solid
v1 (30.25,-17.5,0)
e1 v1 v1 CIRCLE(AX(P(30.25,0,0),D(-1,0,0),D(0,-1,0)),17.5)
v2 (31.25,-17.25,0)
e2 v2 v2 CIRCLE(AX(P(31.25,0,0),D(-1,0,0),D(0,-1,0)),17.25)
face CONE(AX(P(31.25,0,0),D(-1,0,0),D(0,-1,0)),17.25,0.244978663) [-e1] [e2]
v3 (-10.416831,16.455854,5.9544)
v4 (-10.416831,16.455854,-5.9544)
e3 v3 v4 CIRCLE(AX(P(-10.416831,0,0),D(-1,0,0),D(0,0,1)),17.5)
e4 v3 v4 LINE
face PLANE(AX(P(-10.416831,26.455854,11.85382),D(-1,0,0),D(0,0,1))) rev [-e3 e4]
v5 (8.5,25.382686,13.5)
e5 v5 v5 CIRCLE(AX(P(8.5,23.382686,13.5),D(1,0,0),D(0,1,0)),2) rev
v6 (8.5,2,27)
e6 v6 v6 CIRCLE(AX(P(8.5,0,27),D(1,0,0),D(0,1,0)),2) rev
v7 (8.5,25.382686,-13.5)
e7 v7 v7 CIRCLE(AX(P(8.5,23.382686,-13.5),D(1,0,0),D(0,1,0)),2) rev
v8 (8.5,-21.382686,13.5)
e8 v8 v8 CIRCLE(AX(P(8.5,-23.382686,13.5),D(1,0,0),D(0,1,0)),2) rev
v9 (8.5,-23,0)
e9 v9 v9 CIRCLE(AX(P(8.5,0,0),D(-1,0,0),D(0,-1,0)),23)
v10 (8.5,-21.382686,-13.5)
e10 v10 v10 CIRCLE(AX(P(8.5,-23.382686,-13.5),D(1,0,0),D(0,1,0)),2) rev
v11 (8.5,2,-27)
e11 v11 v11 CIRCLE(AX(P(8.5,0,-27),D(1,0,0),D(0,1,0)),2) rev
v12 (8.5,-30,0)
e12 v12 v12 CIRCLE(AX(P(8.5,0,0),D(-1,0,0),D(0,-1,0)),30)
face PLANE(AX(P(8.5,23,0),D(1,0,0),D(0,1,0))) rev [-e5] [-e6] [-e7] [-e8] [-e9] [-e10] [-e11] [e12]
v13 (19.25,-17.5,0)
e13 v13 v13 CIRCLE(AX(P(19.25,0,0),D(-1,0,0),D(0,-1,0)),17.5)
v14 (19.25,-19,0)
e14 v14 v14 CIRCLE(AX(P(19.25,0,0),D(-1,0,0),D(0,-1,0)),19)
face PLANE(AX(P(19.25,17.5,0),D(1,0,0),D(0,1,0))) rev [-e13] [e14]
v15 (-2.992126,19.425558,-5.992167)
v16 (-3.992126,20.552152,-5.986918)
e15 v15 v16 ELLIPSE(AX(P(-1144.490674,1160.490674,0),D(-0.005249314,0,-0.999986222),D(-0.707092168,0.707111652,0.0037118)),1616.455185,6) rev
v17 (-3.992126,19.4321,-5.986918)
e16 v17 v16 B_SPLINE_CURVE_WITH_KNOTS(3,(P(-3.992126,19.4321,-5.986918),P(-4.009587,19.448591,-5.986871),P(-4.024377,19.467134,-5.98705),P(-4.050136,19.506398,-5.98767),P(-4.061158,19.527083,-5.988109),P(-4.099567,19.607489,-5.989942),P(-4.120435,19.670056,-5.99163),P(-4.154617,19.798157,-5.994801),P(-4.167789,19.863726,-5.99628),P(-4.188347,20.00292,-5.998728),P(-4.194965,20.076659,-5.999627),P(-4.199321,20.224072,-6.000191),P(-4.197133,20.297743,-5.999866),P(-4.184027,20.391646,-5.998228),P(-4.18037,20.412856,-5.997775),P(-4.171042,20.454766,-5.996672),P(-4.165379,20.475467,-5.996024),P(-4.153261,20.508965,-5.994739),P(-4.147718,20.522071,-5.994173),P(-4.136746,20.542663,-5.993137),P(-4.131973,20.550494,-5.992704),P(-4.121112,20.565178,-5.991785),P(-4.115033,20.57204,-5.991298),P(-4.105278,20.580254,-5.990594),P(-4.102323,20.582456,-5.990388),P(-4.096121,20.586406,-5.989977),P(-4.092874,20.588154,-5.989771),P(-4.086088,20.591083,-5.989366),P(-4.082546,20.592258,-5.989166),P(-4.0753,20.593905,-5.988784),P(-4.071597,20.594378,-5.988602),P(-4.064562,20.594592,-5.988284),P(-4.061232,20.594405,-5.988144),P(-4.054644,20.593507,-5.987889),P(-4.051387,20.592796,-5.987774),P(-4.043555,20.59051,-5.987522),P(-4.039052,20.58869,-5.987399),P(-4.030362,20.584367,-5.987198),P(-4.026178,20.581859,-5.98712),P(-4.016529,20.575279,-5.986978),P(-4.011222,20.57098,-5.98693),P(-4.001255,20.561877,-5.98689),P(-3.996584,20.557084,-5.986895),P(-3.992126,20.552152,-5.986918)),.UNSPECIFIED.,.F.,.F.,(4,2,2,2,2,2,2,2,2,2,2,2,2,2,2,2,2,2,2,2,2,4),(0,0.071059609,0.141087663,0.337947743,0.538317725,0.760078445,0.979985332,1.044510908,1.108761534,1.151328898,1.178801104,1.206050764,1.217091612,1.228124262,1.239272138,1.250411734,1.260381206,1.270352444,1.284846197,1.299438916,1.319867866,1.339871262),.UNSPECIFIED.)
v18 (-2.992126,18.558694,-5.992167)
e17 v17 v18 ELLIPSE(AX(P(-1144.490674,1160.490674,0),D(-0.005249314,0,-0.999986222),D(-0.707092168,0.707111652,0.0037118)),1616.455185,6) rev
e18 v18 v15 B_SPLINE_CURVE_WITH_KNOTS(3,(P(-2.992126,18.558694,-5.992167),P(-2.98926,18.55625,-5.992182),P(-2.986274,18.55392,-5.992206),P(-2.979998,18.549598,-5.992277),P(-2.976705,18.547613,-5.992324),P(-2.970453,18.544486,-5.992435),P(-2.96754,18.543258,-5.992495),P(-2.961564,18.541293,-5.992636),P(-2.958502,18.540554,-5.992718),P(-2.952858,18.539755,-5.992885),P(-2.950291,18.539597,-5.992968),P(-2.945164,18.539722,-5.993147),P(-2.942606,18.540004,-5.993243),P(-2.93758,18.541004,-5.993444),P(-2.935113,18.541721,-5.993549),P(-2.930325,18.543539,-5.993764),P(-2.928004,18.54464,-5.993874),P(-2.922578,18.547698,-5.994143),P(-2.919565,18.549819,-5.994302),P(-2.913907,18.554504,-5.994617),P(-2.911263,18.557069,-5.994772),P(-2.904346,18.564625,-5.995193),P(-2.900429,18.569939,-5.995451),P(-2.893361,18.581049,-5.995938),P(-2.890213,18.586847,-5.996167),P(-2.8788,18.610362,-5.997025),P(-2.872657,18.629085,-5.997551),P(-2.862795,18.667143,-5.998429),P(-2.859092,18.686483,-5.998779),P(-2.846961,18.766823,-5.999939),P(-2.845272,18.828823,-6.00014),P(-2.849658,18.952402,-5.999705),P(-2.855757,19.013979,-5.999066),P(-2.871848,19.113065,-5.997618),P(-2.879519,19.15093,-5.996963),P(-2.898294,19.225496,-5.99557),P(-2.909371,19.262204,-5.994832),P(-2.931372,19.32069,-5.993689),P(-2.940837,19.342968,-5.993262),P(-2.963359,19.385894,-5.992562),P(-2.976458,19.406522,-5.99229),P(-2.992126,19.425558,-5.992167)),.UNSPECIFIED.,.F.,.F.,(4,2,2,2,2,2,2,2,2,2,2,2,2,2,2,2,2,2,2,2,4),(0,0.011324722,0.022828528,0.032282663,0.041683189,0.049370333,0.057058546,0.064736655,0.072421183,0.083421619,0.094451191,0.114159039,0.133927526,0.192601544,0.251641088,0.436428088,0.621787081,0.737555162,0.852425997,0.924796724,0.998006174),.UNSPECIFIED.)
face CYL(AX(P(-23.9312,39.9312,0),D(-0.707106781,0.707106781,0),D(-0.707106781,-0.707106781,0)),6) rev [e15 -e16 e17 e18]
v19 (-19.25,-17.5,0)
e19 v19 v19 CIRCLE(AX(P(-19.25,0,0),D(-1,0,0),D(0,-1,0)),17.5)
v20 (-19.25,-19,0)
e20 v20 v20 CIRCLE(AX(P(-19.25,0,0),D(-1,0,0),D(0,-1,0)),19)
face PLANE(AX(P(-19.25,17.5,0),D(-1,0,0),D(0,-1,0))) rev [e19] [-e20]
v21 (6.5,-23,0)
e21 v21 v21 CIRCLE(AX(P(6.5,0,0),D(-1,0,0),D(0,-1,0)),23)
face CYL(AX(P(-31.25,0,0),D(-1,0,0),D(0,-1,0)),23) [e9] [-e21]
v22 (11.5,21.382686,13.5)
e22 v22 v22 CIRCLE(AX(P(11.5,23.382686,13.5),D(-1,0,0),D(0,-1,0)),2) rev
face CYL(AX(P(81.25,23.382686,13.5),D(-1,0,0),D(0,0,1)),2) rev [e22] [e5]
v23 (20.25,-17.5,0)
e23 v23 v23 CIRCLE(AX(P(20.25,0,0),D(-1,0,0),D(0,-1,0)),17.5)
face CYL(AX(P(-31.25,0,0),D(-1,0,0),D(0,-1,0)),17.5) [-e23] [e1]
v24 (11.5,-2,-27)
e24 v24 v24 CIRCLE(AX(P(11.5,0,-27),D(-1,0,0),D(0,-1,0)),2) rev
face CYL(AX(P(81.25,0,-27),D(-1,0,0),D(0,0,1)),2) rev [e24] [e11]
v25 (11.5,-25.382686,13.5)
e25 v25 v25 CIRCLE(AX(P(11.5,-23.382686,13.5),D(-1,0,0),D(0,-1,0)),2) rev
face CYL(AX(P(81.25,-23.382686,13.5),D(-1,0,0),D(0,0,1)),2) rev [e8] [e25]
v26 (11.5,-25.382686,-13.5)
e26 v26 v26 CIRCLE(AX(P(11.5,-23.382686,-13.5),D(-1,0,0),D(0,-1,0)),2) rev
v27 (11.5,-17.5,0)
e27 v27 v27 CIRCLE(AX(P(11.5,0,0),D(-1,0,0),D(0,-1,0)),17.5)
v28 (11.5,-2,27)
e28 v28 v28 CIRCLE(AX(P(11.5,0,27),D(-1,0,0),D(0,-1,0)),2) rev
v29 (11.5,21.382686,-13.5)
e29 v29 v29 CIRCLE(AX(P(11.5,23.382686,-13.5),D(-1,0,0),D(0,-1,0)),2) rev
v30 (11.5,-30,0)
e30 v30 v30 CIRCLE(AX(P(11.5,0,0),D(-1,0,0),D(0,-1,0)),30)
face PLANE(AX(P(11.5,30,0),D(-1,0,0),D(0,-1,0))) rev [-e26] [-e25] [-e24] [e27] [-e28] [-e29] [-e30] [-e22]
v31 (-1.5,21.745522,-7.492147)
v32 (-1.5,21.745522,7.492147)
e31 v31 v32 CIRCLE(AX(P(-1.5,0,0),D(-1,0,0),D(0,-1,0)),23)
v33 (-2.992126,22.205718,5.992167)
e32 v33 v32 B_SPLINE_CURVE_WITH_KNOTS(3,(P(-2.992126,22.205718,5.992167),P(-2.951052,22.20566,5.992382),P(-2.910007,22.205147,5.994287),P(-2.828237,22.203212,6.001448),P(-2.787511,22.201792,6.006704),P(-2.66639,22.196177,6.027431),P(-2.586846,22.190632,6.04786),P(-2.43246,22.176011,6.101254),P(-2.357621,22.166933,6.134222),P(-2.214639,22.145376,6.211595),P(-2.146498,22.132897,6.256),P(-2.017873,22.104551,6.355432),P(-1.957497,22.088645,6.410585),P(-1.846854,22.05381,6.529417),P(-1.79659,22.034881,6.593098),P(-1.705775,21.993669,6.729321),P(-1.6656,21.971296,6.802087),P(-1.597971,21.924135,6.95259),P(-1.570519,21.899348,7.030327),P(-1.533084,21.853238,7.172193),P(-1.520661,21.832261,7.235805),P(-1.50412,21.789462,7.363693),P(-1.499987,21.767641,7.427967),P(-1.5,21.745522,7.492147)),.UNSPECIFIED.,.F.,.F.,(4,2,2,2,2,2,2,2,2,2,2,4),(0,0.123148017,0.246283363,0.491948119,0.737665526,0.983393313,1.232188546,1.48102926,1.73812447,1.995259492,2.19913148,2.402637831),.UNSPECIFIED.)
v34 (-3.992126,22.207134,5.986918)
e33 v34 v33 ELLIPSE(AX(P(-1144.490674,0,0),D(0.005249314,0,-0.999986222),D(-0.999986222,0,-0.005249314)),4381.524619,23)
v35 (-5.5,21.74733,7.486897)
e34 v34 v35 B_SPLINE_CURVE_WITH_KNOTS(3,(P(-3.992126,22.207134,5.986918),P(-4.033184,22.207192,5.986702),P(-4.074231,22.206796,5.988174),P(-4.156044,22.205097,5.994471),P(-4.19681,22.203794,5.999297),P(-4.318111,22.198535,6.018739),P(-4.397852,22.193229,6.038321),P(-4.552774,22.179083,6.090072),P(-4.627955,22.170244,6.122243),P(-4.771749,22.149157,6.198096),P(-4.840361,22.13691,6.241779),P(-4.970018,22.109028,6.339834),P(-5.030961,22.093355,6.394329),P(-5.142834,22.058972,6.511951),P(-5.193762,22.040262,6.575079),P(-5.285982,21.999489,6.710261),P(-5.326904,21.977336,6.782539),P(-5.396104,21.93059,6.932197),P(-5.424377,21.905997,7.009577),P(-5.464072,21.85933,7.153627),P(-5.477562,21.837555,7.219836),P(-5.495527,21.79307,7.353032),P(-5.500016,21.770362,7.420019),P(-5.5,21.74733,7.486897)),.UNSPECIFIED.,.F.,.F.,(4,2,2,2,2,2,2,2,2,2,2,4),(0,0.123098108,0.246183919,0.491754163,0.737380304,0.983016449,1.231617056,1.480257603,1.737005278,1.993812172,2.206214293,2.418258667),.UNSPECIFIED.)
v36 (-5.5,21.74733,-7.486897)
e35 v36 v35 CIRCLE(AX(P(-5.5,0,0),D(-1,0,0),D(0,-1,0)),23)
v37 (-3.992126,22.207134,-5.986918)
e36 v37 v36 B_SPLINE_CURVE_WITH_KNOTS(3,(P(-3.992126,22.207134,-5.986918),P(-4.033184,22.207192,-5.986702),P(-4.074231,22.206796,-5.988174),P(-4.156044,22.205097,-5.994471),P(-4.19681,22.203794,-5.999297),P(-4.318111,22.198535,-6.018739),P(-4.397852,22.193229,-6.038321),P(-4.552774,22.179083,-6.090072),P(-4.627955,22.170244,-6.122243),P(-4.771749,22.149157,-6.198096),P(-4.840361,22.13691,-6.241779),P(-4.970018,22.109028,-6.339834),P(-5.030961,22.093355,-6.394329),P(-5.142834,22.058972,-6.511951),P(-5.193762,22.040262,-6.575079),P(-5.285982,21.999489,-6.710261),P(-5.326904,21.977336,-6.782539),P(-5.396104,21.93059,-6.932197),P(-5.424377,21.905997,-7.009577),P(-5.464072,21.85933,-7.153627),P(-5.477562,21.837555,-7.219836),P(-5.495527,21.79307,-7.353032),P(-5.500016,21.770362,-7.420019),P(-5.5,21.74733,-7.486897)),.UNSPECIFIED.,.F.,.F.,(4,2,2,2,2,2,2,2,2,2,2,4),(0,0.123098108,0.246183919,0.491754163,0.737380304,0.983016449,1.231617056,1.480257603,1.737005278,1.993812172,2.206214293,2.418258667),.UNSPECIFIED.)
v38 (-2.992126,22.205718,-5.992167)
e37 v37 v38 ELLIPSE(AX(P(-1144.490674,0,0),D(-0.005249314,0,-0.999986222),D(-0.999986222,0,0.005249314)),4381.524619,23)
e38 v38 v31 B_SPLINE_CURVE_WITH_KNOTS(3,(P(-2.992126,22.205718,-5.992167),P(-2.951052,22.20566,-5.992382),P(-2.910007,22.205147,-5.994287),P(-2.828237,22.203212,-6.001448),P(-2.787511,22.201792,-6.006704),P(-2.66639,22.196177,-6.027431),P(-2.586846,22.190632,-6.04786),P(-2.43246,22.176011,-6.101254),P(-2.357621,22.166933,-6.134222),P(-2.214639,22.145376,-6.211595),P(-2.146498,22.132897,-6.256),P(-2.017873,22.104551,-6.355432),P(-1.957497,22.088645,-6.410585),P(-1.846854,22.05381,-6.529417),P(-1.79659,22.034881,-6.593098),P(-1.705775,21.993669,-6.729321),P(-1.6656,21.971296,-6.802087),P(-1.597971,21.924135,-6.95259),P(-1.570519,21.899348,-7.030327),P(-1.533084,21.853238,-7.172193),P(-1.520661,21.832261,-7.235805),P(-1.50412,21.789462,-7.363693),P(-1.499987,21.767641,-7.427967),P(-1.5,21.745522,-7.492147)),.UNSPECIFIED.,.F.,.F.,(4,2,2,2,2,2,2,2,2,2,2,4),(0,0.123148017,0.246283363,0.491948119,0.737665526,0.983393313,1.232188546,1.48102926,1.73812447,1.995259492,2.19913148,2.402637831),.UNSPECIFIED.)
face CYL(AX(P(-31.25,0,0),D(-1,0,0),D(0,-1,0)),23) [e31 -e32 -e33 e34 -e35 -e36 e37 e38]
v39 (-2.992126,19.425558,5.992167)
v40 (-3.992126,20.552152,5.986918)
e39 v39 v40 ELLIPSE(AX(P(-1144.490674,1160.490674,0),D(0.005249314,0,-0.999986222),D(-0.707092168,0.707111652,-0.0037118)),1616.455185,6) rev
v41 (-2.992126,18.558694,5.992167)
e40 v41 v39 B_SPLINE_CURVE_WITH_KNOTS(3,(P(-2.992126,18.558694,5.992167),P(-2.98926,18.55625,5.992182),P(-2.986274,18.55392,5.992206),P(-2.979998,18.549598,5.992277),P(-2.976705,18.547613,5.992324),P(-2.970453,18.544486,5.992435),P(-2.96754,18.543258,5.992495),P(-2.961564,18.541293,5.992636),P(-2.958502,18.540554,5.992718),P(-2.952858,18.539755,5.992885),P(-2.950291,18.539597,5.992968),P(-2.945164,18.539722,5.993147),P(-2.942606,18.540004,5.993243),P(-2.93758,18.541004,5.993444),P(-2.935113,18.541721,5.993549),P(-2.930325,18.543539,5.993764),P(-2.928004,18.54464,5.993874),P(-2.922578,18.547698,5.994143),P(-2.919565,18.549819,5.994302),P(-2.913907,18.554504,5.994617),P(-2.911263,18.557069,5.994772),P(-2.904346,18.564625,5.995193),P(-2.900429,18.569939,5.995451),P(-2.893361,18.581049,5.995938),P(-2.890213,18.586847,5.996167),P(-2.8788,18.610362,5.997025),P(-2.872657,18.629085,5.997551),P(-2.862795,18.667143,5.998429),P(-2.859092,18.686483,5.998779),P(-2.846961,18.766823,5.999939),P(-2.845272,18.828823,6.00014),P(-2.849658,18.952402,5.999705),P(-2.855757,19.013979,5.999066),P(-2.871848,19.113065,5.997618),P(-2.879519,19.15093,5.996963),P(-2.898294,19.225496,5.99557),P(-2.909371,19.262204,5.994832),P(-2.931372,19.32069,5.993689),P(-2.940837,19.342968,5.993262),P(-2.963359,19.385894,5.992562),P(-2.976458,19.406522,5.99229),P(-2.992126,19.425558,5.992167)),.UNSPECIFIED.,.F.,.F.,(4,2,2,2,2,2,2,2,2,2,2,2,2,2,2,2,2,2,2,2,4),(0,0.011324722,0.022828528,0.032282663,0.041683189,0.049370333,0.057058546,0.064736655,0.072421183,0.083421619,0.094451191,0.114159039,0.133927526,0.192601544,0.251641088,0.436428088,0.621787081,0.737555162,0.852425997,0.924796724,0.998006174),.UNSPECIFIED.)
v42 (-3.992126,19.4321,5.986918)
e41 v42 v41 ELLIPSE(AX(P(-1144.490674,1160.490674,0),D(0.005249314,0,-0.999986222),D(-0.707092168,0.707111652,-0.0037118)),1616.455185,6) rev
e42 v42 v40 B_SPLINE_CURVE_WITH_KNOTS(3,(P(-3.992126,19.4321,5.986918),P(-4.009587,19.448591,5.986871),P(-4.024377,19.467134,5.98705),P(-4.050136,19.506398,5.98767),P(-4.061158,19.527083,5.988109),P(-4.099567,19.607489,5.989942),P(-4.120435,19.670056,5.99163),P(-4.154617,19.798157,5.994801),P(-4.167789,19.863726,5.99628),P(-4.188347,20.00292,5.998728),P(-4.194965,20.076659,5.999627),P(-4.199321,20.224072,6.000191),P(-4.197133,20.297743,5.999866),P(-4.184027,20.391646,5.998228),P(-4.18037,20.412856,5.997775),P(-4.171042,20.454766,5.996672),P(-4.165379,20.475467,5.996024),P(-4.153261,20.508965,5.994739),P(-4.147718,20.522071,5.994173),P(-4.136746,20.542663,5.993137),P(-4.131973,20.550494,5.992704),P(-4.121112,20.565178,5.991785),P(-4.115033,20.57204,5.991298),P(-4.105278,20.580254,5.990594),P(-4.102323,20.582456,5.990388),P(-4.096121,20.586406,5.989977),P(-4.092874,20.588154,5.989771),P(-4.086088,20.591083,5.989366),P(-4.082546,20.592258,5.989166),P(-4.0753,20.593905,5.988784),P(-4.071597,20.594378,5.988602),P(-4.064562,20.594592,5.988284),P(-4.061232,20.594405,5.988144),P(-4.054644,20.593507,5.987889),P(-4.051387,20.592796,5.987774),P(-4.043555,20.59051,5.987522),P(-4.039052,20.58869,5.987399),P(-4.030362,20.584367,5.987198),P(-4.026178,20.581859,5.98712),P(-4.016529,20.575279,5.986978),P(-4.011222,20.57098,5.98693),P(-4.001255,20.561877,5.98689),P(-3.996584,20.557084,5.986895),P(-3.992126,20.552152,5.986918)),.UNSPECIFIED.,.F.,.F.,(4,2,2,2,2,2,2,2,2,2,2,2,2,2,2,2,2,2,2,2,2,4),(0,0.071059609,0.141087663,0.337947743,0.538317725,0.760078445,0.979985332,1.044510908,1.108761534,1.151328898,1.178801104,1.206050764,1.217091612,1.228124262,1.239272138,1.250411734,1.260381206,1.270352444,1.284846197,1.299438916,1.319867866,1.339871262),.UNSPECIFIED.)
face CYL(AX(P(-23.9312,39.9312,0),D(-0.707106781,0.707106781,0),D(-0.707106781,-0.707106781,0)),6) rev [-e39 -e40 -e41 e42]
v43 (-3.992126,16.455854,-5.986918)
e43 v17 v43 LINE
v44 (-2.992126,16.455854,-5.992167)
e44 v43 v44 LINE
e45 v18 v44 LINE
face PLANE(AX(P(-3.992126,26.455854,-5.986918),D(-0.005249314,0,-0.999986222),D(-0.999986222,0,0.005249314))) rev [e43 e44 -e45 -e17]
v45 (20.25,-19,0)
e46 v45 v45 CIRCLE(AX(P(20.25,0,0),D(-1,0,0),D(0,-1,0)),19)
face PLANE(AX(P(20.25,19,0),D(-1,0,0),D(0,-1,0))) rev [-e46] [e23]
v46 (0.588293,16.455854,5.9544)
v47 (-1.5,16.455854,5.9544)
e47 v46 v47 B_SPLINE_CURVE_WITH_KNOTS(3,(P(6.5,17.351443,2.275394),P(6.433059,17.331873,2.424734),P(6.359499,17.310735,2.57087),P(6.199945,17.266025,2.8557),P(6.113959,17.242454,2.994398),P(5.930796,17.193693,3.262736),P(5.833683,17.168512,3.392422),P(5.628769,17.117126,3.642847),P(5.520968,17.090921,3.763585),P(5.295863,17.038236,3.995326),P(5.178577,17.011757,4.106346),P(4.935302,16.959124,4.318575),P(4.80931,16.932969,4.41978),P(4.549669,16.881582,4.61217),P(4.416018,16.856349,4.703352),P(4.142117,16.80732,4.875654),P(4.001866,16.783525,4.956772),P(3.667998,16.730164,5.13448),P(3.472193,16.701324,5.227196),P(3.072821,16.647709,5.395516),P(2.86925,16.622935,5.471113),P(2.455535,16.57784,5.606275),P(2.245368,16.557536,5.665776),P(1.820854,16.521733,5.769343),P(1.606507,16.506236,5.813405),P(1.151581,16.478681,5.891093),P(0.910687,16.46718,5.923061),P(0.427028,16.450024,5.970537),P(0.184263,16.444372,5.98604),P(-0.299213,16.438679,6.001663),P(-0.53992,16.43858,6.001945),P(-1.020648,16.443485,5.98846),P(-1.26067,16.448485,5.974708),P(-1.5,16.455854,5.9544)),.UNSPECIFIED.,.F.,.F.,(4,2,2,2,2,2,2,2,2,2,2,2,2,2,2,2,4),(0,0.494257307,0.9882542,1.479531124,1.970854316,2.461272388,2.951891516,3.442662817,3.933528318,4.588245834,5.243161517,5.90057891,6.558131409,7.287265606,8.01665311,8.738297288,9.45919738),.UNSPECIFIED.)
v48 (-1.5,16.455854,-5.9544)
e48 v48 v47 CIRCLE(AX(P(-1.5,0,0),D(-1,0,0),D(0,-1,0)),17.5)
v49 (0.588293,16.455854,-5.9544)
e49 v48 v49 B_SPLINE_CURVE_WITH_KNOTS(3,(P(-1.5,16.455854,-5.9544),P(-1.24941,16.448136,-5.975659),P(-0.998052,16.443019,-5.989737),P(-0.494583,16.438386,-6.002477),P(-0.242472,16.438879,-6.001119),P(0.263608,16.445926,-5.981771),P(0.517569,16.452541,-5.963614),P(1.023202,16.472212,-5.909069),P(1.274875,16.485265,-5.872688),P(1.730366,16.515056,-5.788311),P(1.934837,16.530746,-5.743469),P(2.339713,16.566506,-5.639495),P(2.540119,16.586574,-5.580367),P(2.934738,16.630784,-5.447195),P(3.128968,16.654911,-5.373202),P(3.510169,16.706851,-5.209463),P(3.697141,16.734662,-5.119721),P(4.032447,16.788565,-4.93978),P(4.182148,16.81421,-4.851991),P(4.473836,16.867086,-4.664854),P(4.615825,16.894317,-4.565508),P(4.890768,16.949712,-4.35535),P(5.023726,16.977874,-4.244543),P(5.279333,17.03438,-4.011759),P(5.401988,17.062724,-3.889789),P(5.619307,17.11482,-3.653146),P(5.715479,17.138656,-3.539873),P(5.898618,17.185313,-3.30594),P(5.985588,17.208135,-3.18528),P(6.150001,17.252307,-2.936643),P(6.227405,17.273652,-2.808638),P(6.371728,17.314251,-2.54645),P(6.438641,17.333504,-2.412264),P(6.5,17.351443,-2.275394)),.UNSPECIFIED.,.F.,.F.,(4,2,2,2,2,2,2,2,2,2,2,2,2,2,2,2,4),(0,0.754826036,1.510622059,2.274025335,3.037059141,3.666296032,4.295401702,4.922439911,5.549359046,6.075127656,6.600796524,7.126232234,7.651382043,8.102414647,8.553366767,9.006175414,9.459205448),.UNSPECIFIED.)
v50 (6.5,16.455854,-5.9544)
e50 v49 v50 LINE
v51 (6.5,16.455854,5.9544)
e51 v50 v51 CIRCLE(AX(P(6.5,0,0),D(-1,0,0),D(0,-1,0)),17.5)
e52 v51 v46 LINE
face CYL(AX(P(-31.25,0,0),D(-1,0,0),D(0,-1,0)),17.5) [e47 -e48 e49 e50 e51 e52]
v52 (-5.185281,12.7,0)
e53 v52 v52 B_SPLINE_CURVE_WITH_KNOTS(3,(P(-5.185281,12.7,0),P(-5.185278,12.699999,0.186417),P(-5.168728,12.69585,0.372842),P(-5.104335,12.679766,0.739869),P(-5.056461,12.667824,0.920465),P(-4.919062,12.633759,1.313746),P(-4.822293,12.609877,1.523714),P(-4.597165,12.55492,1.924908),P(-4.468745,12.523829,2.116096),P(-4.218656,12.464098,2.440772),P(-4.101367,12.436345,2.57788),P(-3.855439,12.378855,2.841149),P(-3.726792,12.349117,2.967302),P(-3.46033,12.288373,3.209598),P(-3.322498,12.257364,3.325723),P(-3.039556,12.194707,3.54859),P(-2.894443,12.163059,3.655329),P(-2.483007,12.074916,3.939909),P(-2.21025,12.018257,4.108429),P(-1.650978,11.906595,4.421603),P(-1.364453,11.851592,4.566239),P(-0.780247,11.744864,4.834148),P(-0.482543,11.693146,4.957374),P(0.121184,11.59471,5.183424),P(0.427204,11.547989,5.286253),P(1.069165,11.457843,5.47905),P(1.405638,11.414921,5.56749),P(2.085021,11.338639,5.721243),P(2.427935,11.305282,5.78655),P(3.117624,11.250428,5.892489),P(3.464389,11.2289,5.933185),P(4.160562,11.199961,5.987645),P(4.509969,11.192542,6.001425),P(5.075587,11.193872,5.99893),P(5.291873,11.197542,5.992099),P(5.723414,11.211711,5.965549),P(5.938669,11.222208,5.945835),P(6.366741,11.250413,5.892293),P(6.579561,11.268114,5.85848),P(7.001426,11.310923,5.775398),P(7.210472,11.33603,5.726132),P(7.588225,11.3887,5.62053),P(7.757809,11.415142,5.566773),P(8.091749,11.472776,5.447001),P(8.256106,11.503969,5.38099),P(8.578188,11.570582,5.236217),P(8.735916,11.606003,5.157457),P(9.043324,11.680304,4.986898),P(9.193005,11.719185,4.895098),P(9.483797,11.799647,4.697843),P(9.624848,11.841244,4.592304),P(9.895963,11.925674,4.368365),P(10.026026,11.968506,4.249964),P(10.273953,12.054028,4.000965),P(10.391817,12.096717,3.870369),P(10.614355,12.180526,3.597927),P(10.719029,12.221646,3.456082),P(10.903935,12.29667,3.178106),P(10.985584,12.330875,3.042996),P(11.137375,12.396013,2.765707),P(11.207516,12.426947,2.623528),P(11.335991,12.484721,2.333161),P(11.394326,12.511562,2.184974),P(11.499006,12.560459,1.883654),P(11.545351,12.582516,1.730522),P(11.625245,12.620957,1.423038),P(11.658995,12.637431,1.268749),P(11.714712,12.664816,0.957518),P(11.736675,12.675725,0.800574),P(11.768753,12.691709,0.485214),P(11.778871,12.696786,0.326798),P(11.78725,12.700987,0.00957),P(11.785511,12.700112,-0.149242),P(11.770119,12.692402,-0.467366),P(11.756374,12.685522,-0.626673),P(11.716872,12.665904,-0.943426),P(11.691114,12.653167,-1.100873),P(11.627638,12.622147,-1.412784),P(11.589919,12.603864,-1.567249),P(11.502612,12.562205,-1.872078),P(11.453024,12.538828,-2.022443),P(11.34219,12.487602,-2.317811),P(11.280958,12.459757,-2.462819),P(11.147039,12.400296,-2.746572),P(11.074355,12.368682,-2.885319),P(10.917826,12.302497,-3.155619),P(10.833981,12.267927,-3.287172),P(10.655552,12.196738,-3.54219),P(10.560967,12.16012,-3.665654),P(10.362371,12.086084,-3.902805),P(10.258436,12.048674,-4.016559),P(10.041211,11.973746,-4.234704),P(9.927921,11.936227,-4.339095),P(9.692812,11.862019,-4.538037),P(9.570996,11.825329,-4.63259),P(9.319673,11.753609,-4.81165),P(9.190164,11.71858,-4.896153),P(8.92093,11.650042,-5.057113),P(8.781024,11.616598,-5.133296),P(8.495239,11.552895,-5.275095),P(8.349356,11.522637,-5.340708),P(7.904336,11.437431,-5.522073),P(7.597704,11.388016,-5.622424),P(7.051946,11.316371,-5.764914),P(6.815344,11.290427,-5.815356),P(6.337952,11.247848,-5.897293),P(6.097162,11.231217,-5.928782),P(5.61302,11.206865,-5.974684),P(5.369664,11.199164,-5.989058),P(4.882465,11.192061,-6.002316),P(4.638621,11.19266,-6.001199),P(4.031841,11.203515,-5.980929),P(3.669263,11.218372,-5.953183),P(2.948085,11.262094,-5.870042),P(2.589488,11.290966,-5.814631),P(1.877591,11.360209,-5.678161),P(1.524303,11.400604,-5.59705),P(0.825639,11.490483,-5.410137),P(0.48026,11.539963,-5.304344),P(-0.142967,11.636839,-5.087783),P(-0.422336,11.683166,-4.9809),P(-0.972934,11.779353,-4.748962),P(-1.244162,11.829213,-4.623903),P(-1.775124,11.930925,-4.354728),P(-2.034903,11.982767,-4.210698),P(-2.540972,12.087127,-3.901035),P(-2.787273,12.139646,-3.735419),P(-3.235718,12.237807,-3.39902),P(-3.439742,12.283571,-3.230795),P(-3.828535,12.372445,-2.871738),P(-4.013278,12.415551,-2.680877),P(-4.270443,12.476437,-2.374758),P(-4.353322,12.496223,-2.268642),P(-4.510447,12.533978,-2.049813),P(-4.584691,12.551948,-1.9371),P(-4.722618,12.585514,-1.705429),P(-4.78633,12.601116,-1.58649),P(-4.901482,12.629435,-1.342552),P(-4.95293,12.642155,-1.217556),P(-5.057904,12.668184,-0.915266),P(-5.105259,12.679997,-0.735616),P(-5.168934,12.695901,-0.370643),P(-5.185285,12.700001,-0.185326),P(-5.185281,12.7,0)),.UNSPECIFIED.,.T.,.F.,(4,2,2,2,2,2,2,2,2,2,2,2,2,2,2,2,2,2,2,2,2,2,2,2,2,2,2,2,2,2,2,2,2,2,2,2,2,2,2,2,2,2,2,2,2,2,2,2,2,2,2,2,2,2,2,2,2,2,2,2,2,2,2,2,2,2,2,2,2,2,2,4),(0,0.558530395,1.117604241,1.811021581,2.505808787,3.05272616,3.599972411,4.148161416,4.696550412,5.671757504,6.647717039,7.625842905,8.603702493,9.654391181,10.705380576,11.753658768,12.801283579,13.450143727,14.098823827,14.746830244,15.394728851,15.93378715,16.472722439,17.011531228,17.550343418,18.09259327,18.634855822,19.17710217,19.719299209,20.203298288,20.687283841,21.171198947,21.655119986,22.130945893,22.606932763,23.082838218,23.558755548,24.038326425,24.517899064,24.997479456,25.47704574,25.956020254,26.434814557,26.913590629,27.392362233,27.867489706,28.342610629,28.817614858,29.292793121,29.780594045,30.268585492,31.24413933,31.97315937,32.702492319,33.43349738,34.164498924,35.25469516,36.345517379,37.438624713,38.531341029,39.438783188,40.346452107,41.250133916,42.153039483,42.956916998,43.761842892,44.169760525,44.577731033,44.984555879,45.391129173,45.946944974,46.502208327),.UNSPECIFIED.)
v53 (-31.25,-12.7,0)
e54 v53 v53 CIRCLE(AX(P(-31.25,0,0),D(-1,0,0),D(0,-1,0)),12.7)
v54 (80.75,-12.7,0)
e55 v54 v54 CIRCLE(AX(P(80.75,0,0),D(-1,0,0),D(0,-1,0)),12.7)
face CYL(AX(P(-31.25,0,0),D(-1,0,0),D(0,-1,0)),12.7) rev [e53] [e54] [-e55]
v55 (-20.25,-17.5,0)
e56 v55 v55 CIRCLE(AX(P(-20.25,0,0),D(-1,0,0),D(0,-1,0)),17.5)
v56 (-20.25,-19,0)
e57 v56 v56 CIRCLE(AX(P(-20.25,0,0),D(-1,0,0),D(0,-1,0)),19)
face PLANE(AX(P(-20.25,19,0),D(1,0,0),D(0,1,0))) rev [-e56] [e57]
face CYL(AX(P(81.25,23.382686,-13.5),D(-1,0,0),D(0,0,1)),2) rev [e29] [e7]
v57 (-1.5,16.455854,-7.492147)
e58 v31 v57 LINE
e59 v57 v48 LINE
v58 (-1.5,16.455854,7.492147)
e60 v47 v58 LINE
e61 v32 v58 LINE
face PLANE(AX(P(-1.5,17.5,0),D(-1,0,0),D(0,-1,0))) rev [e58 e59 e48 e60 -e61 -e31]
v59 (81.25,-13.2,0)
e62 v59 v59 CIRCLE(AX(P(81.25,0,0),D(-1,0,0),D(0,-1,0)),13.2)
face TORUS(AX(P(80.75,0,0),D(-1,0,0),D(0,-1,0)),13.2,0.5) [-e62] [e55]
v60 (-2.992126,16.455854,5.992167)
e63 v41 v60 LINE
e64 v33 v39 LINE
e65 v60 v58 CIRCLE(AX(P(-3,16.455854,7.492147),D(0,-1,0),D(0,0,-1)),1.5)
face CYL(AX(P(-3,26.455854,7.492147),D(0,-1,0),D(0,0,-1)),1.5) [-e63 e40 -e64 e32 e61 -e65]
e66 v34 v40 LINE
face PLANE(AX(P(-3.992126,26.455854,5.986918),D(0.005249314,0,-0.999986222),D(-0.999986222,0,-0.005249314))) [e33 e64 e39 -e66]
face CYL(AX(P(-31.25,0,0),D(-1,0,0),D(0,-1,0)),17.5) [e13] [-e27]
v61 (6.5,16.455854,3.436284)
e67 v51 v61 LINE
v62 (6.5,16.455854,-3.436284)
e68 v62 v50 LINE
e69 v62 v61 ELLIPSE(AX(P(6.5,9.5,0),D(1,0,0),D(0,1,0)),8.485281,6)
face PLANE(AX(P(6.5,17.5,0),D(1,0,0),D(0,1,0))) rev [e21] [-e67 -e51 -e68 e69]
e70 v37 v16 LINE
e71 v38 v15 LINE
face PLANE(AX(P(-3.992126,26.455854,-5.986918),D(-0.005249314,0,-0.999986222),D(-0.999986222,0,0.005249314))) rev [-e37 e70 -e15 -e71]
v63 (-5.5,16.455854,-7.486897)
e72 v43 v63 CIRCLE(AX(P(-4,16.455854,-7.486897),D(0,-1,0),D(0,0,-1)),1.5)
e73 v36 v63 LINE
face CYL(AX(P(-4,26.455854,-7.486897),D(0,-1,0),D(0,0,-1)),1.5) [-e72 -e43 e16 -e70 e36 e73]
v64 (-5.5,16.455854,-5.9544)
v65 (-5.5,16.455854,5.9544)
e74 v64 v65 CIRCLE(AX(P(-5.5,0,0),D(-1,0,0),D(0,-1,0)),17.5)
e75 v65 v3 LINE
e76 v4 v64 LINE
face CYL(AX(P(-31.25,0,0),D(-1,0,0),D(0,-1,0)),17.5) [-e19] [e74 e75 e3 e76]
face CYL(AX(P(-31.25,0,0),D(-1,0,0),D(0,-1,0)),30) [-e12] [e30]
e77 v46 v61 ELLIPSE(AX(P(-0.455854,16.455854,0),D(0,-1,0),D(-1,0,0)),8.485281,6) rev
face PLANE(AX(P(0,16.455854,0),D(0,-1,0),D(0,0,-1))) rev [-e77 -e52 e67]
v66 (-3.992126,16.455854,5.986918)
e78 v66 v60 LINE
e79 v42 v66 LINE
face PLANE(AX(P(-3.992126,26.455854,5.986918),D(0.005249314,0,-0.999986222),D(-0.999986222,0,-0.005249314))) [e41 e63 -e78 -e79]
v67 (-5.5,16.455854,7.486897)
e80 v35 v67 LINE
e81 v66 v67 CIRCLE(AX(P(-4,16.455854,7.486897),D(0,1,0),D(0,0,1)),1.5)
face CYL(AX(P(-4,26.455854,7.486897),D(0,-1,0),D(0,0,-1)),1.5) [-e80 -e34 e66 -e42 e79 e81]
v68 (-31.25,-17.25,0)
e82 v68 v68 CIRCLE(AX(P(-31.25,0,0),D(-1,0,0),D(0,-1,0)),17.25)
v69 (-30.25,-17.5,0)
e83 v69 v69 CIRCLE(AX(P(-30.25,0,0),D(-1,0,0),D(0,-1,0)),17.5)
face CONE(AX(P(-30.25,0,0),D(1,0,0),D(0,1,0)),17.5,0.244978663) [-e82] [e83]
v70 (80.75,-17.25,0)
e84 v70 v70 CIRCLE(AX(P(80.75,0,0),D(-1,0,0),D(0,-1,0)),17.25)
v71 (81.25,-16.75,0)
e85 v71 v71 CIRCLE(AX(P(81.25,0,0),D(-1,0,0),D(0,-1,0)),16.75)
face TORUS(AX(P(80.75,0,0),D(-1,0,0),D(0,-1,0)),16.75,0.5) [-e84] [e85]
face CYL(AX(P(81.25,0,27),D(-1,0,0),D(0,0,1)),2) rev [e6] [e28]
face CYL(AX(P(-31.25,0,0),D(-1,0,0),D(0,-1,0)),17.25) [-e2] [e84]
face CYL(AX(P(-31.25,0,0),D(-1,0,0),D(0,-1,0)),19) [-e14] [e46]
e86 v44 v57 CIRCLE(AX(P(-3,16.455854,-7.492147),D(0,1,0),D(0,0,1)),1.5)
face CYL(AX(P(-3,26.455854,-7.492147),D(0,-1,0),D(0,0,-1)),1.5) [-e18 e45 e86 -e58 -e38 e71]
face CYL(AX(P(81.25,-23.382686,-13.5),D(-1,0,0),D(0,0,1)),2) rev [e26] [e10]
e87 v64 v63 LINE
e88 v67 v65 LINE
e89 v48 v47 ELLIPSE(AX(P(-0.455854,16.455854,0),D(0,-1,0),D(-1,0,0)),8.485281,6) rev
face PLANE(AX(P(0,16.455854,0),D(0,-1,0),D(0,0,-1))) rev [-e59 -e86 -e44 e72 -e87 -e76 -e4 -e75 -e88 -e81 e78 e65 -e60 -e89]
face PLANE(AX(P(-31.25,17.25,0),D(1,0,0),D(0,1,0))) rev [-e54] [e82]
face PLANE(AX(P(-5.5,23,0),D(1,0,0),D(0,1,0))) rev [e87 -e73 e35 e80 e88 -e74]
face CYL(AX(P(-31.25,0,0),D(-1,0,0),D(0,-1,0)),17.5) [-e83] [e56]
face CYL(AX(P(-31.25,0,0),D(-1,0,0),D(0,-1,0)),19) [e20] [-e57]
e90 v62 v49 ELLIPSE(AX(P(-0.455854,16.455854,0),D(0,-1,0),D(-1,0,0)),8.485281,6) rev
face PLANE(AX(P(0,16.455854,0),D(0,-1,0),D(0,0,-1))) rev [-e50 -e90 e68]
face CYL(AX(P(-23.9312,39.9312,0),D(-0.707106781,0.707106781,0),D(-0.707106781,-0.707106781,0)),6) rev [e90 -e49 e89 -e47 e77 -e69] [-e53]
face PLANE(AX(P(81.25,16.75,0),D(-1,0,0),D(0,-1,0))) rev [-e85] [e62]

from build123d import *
from build123d.topology import SkipClean

# Parameters (mm, degrees)
SKETCH2_R          = 2
CUT_EXTRUDE1_DEPTH = 92.660037639
CUT_EXTRUDE2_DEPTH = 6.025391911


# Read off the part's stored shape, not the designer's step: Cut-Extrude2
with BuildPart() as part:
    # Sketch1 → Revolve1 (revolve)
    with BuildSketch(Plane.XY, mode=Mode.PRIVATE) as revolve1_sk:
        with BuildLine():
            Line((-1.5, 17.5), (6.5, 17.5))
            Line((6.5, 17.5), (6.5, 23))
            Line((6.5, 23), (8.5, 23))
            Line((8.5, 23), (8.5, 30))
            Line((8.5, 30), (11.5, 30))
            Line((11.5, 30), (11.5, 17.5))
            Line((11.5, 17.5), (19.25, 17.5))
            Line((19.25, 17.5), (19.25, 19))
            Line((19.25, 19), (20.25, 19))
            Line((20.25, 19), (20.25, 17.5))
            Line((20.25, 17.5), (30.25, 17.5))
            Line((30.25, 17.5), (31.25, 17.25))
            Line((31.25, 17.25), (80.75, 17.25))
            ThreePointArc((80.75, 17.25), (81.103553391, 17.103553391), (81.25, 16.75))
            Line((81.25, 16.75), (81.25, 13.2))
            ThreePointArc((81.25, 13.2), (81.103553391, 12.846446609), (80.75, 12.7))
            Line((80.75, 12.7), (-31.25, 12.7))
            Line((-31.25, 12.7), (-31.25, 17.25))
            Line((-31.25, 17.25), (-30.25, 17.5))
            Line((-30.25, 17.5), (-20.25, 17.5))
            Line((-20.25, 17.5), (-20.25, 19))
            Line((-20.25, 19), (-19.25, 19))
            Line((-19.25, 19), (-19.25, 17.5))
            Line((-19.25, 17.5), (-5.5, 17.5))
            Line((-5.5, 17.5), (-5.5, 23))
            Line((-5.5, 23), (-1.5, 23))
            Line((-1.5, 23), (-1.5, 17.5))
        make_face()
    revolve(revolve1_sk.sketch.rotate(Axis((-31.25, 0, 0), (1, 0, 0)), 180), axis=Axis((-31.25, 0, 0), (1, 0, 0)))

    # Sketch2 → Cut-Extrude1 (cut, through all)
    with BuildSketch(Plane(origin=(0, 0, 0), x_dir=(0, 0, -1), z_dir=(1, 0, 0))):
        with Locations(Location((27, 0, 0), (0, 0, 270))):
            Circle(SKETCH2_R)
        with Locations(Location((13.5, -23.382685902, 0), (0, 0, 270))):
            Circle(SKETCH2_R)
        with Locations(Location((-13.5, -23.382685902, 0), (0, 0, 270))):
            Circle(SKETCH2_R)
        with Locations(Location((-27, 0, 0), (0, 0, 270))):
            Circle(SKETCH2_R)
        with Locations(Location((-13.5, 23.382685902, 0), (0, 0, 270))):
            Circle(SKETCH2_R)
        with Locations(Location((13.5, 23.382685902, 0), (0, 0, 270))):
            Circle(SKETCH2_R)
    extrude(amount=CUT_EXTRUDE1_DEPTH, mode=Mode.SUBTRACT)

    # Sketch3 → Cut-Revolve1 (revolve, cut)
    with BuildSketch(Plane.XY):
        Polygon((16, 0), (-16.947446606, 32.947446606), (-21.190087293, 28.704805919), (11.757359313, -4.242640687), align=None)
    revolve(axis=Axis((-23.931199794, 39.931199794, 0), (0.7071067811865516, -0.7071067811865436, 0)), mode=Mode.SUBTRACT)

    # Cut-Extrude2 outline → Cut-Extrude2 (cut)
    with SkipClean():  # the faces are left unmerged after this step: merging them gives an invalid solid
        with BuildSketch(Plane(origin=(0, 16.455853693, 0), x_dir=(1, 0, 0), z_dir=(0, 1, 0))):
            with BuildLine():
                Line((-2.992126028, 5.992167254), (-3.992126028, 5.986917867))
                ThreePointArc((-3.992126028, 5.986917867), (-5.057872639, 6.423456803), (-5.5, 7.4868972))
                Line((-5.5, 7.4868972), (-5.5, 11.85382039))
                Line((-5.5, 11.85382039), (-10.416830721, 11.85382039))
                Line((-10.416830721, 11.85382039), (-10.416830721, 5.95439999))
                Line((-10.416830721, 5.95439999), (-10.416830721, -5.95439999))
                Line((-10.416830721, -5.95439999), (-10.416830721, -11.85382039))
                Line((-10.416830721, -11.85382039), (-5.5, -11.85382039))
                Line((-5.5, -11.85382039), (-5.5, -7.4868972))
                ThreePointArc((-5.5, -7.4868972), (-5.057872639, -6.423456803), (-3.992126028, -5.986917867))
                Line((-3.992126028, -5.986917867), (-2.992126028, -5.992167254))
                ThreePointArc((-2.992126028, -5.992167254), (-1.936559603, -6.434273947), (-1.5, -7.492146587))
                Line((-1.5, -7.492146587), (-1.5, -11.85382039))
                Line((-1.5, -11.85382039), (6.5, -11.85382039))
                Line((6.5, -11.85382039), (6.5, 11.85382039))
                Line((6.5, 11.85382039), (-1.5, 11.85382039))
                Line((-1.5, 11.85382039), (-1.5, 7.492146587))
                ThreePointArc((-1.5, 7.492146587), (-1.936559603, 6.434273947), (-2.992126028, 5.992167254))
            make_face()
        extrude(amount=CUT_EXTRUDE2_DEPTH, mode=Mode.SUBTRACT)


solid = part.part
